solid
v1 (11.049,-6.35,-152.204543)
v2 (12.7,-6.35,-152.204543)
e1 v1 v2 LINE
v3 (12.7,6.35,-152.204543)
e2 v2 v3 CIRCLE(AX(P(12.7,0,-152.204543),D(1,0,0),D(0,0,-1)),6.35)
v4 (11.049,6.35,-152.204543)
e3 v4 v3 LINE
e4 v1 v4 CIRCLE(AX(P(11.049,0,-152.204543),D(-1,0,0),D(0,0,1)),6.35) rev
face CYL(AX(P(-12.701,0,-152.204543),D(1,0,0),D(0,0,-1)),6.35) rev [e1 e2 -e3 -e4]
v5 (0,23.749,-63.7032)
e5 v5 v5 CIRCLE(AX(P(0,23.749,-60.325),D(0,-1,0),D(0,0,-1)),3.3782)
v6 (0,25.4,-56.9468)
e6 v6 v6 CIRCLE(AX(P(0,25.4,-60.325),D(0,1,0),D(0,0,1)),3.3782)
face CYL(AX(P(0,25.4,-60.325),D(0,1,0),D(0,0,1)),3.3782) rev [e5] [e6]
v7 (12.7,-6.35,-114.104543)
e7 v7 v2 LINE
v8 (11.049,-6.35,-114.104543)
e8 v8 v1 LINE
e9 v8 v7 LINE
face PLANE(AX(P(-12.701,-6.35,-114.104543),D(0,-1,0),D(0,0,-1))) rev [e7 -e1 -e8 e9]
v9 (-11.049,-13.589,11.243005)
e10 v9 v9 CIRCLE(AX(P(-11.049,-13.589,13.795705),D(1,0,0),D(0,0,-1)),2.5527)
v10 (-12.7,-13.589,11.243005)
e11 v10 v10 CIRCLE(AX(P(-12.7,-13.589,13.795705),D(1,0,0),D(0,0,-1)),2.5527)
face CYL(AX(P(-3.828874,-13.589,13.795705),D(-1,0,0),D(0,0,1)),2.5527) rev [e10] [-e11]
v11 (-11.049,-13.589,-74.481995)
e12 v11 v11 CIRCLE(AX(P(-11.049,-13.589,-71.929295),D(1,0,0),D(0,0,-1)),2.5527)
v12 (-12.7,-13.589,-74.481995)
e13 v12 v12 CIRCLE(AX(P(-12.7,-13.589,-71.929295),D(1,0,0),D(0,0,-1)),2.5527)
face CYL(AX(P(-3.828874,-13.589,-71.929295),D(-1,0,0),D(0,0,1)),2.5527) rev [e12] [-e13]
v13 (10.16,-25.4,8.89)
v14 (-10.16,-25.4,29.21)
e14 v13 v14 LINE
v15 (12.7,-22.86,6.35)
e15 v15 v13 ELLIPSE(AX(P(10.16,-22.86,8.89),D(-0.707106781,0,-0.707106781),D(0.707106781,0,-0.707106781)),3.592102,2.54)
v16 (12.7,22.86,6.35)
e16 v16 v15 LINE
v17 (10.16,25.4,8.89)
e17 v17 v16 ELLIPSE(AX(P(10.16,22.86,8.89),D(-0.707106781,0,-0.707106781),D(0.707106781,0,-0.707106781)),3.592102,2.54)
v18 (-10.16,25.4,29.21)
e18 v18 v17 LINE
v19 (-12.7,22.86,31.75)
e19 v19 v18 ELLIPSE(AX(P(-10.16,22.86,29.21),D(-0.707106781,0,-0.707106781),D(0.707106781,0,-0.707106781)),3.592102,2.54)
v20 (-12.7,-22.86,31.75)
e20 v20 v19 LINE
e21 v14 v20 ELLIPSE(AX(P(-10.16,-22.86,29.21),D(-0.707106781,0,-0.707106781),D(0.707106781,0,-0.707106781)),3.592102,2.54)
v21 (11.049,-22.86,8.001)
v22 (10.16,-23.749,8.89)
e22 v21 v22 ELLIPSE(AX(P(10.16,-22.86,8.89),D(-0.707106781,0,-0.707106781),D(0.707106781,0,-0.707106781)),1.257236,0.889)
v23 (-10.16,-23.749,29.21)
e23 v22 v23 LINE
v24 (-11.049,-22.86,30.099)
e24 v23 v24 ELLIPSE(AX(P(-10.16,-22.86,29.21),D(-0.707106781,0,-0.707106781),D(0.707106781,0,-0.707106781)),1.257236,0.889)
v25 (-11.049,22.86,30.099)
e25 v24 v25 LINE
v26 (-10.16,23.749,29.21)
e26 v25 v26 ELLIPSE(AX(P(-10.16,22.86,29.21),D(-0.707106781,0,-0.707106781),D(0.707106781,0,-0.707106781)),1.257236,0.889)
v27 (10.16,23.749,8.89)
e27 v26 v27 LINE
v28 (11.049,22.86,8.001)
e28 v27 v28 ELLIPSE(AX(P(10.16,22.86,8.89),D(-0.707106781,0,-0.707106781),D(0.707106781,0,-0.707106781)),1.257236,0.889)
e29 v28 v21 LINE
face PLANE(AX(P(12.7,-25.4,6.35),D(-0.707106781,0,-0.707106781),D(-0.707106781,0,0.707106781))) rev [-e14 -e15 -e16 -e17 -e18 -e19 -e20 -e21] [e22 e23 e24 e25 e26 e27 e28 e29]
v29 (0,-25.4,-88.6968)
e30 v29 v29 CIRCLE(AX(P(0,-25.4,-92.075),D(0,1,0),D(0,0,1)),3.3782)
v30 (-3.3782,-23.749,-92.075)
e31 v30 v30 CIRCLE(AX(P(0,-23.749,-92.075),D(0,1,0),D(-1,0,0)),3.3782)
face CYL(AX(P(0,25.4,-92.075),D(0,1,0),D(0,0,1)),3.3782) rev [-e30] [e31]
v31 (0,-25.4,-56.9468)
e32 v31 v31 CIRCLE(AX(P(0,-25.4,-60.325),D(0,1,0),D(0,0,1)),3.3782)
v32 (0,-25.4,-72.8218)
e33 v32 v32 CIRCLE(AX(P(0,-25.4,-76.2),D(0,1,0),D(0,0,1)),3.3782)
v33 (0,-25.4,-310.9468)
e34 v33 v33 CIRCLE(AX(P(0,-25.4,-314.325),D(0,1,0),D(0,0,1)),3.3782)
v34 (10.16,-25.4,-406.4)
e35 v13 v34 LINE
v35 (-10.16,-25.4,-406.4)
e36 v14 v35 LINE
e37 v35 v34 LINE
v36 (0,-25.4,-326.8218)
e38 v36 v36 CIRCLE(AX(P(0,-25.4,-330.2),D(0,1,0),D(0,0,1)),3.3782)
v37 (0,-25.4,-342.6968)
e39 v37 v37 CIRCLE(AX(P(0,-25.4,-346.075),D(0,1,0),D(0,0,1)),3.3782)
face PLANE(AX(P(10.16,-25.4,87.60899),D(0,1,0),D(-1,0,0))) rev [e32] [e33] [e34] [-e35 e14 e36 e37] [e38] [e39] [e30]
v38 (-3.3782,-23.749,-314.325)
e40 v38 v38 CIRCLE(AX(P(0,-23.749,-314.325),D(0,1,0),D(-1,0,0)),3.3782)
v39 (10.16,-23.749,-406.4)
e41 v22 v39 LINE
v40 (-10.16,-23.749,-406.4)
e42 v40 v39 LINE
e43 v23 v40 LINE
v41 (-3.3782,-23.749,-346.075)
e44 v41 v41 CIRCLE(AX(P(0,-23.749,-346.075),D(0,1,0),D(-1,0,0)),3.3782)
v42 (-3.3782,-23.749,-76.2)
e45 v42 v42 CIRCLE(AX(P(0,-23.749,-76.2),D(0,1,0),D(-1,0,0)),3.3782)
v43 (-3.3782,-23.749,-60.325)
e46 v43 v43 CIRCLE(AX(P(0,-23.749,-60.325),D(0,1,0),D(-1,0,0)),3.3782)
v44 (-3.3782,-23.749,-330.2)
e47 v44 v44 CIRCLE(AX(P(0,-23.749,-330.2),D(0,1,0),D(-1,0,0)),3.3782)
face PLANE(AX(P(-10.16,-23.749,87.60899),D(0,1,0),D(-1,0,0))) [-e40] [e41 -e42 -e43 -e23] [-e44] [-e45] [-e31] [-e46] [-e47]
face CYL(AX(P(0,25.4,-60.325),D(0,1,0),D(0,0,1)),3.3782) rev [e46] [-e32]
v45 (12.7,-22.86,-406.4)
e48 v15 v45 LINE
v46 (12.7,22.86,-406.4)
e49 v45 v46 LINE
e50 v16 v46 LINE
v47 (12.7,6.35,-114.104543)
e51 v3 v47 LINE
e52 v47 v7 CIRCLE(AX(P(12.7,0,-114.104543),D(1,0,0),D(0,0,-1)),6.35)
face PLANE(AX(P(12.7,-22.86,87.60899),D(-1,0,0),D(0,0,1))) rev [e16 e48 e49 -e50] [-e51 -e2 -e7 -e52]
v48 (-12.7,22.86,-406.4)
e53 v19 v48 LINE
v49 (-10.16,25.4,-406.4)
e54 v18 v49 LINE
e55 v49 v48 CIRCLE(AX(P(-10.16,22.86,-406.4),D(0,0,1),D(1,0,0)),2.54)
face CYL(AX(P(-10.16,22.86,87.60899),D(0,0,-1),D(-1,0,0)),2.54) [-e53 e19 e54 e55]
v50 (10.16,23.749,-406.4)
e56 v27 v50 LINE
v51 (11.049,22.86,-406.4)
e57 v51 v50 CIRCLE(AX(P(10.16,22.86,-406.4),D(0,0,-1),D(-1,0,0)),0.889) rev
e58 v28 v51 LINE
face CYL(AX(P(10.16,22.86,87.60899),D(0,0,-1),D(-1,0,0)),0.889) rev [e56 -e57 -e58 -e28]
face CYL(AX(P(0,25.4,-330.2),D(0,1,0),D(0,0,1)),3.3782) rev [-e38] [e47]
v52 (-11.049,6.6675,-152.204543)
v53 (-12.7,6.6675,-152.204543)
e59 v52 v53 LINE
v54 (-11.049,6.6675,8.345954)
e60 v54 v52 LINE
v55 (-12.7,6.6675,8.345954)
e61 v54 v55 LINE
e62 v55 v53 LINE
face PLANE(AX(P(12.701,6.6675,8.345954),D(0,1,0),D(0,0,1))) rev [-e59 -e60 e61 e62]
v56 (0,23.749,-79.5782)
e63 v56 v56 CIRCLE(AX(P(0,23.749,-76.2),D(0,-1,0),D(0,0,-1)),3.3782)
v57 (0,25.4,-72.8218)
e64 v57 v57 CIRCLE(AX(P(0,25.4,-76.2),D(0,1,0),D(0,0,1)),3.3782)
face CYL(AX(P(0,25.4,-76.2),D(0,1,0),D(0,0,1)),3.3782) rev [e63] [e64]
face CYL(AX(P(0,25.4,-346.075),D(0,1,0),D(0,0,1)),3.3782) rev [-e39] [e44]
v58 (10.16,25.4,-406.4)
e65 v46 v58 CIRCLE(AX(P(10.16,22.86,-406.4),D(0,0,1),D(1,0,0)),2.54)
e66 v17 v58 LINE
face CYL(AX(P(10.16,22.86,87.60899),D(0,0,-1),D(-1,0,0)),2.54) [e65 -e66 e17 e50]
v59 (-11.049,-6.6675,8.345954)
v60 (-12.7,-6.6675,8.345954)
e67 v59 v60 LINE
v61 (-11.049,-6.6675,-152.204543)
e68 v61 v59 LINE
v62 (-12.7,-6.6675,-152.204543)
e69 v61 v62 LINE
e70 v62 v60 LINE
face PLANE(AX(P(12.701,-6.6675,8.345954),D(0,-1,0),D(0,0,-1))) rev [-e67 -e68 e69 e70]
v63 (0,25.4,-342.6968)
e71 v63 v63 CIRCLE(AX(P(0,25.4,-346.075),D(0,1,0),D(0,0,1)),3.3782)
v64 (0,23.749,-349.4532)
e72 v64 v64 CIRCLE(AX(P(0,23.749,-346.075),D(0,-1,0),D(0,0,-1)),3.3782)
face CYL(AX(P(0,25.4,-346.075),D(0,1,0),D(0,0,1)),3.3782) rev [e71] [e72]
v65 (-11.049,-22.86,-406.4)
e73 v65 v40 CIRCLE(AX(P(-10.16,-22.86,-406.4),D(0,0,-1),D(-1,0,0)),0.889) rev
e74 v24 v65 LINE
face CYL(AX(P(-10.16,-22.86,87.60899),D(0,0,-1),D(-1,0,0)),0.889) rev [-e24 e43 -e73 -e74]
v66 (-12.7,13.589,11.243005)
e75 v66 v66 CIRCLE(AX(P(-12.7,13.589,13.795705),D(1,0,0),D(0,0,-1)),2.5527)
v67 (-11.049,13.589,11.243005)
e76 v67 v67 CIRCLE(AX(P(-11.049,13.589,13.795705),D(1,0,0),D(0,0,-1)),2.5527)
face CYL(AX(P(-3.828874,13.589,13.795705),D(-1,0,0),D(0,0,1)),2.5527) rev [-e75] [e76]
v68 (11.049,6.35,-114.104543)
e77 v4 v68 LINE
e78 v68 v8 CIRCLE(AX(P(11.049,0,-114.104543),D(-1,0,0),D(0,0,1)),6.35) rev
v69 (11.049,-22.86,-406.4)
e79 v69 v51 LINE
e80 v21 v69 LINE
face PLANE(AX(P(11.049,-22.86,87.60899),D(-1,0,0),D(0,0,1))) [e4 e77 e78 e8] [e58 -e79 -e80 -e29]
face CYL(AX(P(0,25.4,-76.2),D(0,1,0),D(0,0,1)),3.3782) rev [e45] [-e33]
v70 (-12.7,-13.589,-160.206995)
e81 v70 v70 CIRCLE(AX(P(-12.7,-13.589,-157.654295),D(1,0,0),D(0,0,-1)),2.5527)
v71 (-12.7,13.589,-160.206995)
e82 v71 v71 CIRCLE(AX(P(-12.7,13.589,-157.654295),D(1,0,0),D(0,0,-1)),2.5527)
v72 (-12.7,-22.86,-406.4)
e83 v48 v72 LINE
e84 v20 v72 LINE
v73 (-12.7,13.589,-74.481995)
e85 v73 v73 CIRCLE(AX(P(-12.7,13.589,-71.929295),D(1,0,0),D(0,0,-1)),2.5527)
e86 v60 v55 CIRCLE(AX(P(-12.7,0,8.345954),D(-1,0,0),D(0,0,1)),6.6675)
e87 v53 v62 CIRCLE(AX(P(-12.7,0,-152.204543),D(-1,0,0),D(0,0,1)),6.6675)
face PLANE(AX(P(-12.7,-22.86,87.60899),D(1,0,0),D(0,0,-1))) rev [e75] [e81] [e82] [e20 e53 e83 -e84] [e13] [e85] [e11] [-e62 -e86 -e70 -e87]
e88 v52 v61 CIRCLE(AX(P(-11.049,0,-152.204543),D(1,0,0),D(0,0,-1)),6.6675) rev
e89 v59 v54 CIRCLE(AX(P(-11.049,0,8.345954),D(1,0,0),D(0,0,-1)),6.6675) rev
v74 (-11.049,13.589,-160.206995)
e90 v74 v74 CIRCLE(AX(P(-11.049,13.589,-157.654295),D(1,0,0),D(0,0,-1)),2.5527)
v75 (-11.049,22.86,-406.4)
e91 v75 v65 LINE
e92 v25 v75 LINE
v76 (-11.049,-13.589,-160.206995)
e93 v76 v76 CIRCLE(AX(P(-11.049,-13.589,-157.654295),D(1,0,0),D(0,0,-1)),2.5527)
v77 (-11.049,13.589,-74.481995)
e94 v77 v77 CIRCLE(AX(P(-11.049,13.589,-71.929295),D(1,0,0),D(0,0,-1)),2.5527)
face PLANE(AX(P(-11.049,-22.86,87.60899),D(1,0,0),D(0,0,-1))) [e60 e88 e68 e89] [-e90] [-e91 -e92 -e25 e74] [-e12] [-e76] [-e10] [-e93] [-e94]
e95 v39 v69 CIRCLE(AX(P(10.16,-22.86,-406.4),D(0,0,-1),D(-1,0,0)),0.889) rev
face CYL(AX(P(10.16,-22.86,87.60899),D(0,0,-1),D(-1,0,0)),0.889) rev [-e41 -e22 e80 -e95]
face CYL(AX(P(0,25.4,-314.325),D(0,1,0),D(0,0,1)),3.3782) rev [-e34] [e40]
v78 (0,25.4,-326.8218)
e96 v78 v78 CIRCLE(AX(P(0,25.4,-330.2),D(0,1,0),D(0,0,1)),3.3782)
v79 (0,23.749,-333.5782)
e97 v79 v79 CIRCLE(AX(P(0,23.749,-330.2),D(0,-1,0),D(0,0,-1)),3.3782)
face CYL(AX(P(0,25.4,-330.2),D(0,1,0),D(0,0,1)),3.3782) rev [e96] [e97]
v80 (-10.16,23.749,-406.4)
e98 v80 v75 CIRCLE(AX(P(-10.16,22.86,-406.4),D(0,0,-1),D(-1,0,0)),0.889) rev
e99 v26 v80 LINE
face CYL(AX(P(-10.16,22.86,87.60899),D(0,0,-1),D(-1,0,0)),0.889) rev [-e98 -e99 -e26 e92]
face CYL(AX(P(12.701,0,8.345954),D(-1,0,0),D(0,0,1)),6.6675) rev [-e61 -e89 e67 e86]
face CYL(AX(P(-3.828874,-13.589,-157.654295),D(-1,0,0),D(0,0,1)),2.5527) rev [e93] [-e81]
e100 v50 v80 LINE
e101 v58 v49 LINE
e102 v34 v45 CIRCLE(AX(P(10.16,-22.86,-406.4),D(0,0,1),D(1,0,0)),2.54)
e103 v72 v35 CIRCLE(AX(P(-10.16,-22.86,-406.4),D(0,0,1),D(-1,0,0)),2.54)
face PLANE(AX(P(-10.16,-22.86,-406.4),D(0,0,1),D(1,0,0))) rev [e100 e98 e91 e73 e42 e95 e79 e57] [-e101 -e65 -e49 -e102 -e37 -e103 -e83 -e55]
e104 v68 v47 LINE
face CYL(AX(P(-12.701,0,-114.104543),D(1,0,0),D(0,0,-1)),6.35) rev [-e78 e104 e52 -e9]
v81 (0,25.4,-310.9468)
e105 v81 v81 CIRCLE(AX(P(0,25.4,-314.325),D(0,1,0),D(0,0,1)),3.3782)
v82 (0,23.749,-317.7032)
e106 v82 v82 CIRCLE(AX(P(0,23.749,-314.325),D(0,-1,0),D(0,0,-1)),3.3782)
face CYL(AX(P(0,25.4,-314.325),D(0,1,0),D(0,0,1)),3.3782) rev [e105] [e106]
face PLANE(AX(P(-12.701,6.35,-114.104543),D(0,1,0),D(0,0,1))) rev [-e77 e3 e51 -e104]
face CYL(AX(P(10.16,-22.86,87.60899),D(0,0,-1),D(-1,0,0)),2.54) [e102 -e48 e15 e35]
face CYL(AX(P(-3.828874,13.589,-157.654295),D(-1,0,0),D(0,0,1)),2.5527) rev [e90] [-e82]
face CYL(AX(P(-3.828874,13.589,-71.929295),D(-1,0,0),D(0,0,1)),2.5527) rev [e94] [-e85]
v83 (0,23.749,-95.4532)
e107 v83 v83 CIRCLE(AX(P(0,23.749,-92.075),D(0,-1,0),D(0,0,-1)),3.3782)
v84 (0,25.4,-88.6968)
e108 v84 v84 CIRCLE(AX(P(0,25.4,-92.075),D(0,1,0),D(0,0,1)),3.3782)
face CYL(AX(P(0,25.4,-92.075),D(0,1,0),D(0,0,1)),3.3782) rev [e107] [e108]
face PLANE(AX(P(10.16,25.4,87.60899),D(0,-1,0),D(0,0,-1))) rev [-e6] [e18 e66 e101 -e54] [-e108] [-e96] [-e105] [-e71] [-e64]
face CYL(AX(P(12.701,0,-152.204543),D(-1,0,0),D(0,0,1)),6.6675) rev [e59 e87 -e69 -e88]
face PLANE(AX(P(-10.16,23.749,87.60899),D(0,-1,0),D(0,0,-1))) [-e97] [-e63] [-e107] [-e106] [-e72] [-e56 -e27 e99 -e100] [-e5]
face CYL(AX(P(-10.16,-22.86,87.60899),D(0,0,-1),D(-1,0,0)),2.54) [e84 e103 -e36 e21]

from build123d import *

# Parameters (mm, degrees)
EXTRUDE_THIN1_START       = -406.4
EXTRUDE_THIN1_DEPTH       = 438.15
EXTRUDE_THIN1_START_2     = 13.470384182
EXTRUDE_THIN1_2_OUTLINE_W = 39
EXTRUDE_THIN1_2_OUTLINE_H = 54
EXTRUDE_THIN1_2_DEPTH     = 18.529615818
CUT_EXTRUDE2_REACH        = 409.984
CUT_EXTRUDE4_REACH        = 409.984
SKETCH5_R                 = 2.5527
CUT_EXTRUDE3_DEPTH        = 1.651
F_1_4_CLEARANCE_HOLE1_D   = 6.7564


with BuildPart() as part:
    # Extrude-Thin1: read off the stored shape, not the designer's step
    # Extrude-Thin1 outline → Extrude-Thin1 (new body)
    with BuildSketch(Plane.XY.offset(EXTRUDE_THIN1_START)):
        with BuildLine():
            ThreePointArc((-12.7, -22.86), (-11.956051224, -24.656051224), (-10.16, -25.4))
            Line((-10.16, -25.4), (10.16, -25.4))
            ThreePointArc((10.16, -25.4), (11.956051224, -24.656051224), (12.7, -22.86))
            Line((12.7, -22.86), (12.7, 22.86))
            ThreePointArc((12.7, 22.86), (11.956051224, 24.656051224), (10.16, 25.4))
            Line((10.16, 25.4), (-10.16, 25.4))
            ThreePointArc((-10.16, 25.4), (-11.956051224, 24.656051224), (-12.7, 22.86))
            Line((-12.7, 22.86), (-12.7, -22.86))
        make_face()
        with BuildLine():
            Line((10.16, -23.749), (-10.16, -23.749))
            ThreePointArc((-10.16, -23.749), (-10.788617928, -23.488617928), (-11.049, -22.86))
            Line((-11.049, -22.86), (-11.049, 22.86))
            ThreePointArc((-11.049, 22.86), (-10.788617928, 23.488617928), (-10.16, 23.749))
            Line((-10.16, 23.749), (10.16, 23.749))
            ThreePointArc((10.16, 23.749), (10.788617928, 23.488617928), (11.049, 22.86))
            Line((11.049, 22.86), (11.049, -22.86))
            ThreePointArc((11.049, -22.86), (10.788617928, -23.488617928), (10.16, -23.749))
        make_face(mode=Mode.SUBTRACT)
    extrude(amount=EXTRUDE_THIN1_DEPTH)

    # Extrude-Thin1 2 outline → Extrude-Thin1 2 (cut)
    with BuildSketch(Plane(origin=(0, 0, 0), x_dir=(0.707106781186548, 0, -0.707106781186547), z_dir=(0.707106781186547, 0, 0.707106781186548)).offset(EXTRUDE_THIN1_START_2)):
        with Locations((-13.5, 0)):
            Rectangle(EXTRUDE_THIN1_2_OUTLINE_W, EXTRUDE_THIN1_2_OUTLINE_H)
    extrude(amount=EXTRUDE_THIN1_2_DEPTH, mode=Mode.SUBTRACT)

    # Sketch3 → Cut-Extrude2 (cut, up to next)
    with BuildSketch(Plane.ZY.offset(12.7), mode=Mode.PRIVATE) as cut_extrude2_sk1:
        with BuildLine():
            Line((8.345953821, -6.6675), (-152.204543073, -6.6675))
            ThreePointArc((-152.204543073, -6.6675), (-158.872043073, 0), (-152.204543073, 6.6675))
            Line((-152.204543073, 6.6675), (8.345953821, 6.6675))
            ThreePointArc((8.345953821, 6.6675), (15.013453821, 0), (8.345953821, -6.6675))
        make_face()
    cut_extrude2_tool1 = extrude(cut_extrude2_sk1.sketch, amount=-CUT_EXTRUDE2_REACH, mode=Mode.PRIVATE) & part.part
    add(cut_extrude2_tool1.solids().sort_by_distance((-12.7, 0, -71.929295))[0], mode=Mode.SUBTRACT)

    # Sketch6 → Cut-Extrude4 (cut, up to next)
    with BuildSketch(Plane(origin=(12.7, 0, 0), x_dir=(0, 0, -1), z_dir=(1, 0, 0)), mode=Mode.PRIVATE) as cut_extrude4_sk1:
        with BuildLine():
            Line((114.104543073, 6.35), (152.204543073, 6.35))
            ThreePointArc((152.204543073, 6.35), (158.554543073, 0), (152.204543073, -6.35))
            Line((152.204543073, -6.35), (114.104543073, -6.35))
            ThreePointArc((114.104543073, -6.35), (107.754543073, 0), (114.104543073, 6.35))
        make_face()
    cut_extrude4_tool1 = extrude(cut_extrude4_sk1.sketch, amount=-CUT_EXTRUDE4_REACH, mode=Mode.PRIVATE) & part.part
    add(cut_extrude4_tool1.solids().sort_by_distance((12.7, 0, -133.154543))[0], mode=Mode.SUBTRACT)

    # Sketch5 → Cut-Extrude3 (cut)
    with BuildSketch(Plane(origin=(-12.7, 0, 0), x_dir=(0, 0, -1), z_dir=(1, 0, 0))):
        with Locations((-13.795705431, 13.589)):
            Circle(SKETCH5_R)
        with Locations((-13.795705431, -13.589)):
            Circle(SKETCH5_R)
        with Locations((71.929294569, -13.589)):
            Circle(SKETCH5_R)
        with Locations((71.929294569, 13.589)):
            Circle(SKETCH5_R)
        with Locations((157.654294569, 13.589)):
            Circle(SKETCH5_R)
        with Locations((157.654294569, -13.589)):
            Circle(SKETCH5_R)
    extrude(amount=CUT_EXTRUDE3_DEPTH, mode=Mode.SUBTRACT)

    # 1/4 Clearance Hole1 (through all)
    with Locations(Plane(origin=(0, 25.4, 0), x_dir=(1, 0, 0), z_dir=(0, 1, 0))):
        with Locations((0, 346.075), (0, 330.2), (0, 314.325), (0, 60.325), (0, 76.2), (0, 92.075)):
            Hole(F_1_4_CLEARANCE_HOLE1_D / 2)


solid = part.part
